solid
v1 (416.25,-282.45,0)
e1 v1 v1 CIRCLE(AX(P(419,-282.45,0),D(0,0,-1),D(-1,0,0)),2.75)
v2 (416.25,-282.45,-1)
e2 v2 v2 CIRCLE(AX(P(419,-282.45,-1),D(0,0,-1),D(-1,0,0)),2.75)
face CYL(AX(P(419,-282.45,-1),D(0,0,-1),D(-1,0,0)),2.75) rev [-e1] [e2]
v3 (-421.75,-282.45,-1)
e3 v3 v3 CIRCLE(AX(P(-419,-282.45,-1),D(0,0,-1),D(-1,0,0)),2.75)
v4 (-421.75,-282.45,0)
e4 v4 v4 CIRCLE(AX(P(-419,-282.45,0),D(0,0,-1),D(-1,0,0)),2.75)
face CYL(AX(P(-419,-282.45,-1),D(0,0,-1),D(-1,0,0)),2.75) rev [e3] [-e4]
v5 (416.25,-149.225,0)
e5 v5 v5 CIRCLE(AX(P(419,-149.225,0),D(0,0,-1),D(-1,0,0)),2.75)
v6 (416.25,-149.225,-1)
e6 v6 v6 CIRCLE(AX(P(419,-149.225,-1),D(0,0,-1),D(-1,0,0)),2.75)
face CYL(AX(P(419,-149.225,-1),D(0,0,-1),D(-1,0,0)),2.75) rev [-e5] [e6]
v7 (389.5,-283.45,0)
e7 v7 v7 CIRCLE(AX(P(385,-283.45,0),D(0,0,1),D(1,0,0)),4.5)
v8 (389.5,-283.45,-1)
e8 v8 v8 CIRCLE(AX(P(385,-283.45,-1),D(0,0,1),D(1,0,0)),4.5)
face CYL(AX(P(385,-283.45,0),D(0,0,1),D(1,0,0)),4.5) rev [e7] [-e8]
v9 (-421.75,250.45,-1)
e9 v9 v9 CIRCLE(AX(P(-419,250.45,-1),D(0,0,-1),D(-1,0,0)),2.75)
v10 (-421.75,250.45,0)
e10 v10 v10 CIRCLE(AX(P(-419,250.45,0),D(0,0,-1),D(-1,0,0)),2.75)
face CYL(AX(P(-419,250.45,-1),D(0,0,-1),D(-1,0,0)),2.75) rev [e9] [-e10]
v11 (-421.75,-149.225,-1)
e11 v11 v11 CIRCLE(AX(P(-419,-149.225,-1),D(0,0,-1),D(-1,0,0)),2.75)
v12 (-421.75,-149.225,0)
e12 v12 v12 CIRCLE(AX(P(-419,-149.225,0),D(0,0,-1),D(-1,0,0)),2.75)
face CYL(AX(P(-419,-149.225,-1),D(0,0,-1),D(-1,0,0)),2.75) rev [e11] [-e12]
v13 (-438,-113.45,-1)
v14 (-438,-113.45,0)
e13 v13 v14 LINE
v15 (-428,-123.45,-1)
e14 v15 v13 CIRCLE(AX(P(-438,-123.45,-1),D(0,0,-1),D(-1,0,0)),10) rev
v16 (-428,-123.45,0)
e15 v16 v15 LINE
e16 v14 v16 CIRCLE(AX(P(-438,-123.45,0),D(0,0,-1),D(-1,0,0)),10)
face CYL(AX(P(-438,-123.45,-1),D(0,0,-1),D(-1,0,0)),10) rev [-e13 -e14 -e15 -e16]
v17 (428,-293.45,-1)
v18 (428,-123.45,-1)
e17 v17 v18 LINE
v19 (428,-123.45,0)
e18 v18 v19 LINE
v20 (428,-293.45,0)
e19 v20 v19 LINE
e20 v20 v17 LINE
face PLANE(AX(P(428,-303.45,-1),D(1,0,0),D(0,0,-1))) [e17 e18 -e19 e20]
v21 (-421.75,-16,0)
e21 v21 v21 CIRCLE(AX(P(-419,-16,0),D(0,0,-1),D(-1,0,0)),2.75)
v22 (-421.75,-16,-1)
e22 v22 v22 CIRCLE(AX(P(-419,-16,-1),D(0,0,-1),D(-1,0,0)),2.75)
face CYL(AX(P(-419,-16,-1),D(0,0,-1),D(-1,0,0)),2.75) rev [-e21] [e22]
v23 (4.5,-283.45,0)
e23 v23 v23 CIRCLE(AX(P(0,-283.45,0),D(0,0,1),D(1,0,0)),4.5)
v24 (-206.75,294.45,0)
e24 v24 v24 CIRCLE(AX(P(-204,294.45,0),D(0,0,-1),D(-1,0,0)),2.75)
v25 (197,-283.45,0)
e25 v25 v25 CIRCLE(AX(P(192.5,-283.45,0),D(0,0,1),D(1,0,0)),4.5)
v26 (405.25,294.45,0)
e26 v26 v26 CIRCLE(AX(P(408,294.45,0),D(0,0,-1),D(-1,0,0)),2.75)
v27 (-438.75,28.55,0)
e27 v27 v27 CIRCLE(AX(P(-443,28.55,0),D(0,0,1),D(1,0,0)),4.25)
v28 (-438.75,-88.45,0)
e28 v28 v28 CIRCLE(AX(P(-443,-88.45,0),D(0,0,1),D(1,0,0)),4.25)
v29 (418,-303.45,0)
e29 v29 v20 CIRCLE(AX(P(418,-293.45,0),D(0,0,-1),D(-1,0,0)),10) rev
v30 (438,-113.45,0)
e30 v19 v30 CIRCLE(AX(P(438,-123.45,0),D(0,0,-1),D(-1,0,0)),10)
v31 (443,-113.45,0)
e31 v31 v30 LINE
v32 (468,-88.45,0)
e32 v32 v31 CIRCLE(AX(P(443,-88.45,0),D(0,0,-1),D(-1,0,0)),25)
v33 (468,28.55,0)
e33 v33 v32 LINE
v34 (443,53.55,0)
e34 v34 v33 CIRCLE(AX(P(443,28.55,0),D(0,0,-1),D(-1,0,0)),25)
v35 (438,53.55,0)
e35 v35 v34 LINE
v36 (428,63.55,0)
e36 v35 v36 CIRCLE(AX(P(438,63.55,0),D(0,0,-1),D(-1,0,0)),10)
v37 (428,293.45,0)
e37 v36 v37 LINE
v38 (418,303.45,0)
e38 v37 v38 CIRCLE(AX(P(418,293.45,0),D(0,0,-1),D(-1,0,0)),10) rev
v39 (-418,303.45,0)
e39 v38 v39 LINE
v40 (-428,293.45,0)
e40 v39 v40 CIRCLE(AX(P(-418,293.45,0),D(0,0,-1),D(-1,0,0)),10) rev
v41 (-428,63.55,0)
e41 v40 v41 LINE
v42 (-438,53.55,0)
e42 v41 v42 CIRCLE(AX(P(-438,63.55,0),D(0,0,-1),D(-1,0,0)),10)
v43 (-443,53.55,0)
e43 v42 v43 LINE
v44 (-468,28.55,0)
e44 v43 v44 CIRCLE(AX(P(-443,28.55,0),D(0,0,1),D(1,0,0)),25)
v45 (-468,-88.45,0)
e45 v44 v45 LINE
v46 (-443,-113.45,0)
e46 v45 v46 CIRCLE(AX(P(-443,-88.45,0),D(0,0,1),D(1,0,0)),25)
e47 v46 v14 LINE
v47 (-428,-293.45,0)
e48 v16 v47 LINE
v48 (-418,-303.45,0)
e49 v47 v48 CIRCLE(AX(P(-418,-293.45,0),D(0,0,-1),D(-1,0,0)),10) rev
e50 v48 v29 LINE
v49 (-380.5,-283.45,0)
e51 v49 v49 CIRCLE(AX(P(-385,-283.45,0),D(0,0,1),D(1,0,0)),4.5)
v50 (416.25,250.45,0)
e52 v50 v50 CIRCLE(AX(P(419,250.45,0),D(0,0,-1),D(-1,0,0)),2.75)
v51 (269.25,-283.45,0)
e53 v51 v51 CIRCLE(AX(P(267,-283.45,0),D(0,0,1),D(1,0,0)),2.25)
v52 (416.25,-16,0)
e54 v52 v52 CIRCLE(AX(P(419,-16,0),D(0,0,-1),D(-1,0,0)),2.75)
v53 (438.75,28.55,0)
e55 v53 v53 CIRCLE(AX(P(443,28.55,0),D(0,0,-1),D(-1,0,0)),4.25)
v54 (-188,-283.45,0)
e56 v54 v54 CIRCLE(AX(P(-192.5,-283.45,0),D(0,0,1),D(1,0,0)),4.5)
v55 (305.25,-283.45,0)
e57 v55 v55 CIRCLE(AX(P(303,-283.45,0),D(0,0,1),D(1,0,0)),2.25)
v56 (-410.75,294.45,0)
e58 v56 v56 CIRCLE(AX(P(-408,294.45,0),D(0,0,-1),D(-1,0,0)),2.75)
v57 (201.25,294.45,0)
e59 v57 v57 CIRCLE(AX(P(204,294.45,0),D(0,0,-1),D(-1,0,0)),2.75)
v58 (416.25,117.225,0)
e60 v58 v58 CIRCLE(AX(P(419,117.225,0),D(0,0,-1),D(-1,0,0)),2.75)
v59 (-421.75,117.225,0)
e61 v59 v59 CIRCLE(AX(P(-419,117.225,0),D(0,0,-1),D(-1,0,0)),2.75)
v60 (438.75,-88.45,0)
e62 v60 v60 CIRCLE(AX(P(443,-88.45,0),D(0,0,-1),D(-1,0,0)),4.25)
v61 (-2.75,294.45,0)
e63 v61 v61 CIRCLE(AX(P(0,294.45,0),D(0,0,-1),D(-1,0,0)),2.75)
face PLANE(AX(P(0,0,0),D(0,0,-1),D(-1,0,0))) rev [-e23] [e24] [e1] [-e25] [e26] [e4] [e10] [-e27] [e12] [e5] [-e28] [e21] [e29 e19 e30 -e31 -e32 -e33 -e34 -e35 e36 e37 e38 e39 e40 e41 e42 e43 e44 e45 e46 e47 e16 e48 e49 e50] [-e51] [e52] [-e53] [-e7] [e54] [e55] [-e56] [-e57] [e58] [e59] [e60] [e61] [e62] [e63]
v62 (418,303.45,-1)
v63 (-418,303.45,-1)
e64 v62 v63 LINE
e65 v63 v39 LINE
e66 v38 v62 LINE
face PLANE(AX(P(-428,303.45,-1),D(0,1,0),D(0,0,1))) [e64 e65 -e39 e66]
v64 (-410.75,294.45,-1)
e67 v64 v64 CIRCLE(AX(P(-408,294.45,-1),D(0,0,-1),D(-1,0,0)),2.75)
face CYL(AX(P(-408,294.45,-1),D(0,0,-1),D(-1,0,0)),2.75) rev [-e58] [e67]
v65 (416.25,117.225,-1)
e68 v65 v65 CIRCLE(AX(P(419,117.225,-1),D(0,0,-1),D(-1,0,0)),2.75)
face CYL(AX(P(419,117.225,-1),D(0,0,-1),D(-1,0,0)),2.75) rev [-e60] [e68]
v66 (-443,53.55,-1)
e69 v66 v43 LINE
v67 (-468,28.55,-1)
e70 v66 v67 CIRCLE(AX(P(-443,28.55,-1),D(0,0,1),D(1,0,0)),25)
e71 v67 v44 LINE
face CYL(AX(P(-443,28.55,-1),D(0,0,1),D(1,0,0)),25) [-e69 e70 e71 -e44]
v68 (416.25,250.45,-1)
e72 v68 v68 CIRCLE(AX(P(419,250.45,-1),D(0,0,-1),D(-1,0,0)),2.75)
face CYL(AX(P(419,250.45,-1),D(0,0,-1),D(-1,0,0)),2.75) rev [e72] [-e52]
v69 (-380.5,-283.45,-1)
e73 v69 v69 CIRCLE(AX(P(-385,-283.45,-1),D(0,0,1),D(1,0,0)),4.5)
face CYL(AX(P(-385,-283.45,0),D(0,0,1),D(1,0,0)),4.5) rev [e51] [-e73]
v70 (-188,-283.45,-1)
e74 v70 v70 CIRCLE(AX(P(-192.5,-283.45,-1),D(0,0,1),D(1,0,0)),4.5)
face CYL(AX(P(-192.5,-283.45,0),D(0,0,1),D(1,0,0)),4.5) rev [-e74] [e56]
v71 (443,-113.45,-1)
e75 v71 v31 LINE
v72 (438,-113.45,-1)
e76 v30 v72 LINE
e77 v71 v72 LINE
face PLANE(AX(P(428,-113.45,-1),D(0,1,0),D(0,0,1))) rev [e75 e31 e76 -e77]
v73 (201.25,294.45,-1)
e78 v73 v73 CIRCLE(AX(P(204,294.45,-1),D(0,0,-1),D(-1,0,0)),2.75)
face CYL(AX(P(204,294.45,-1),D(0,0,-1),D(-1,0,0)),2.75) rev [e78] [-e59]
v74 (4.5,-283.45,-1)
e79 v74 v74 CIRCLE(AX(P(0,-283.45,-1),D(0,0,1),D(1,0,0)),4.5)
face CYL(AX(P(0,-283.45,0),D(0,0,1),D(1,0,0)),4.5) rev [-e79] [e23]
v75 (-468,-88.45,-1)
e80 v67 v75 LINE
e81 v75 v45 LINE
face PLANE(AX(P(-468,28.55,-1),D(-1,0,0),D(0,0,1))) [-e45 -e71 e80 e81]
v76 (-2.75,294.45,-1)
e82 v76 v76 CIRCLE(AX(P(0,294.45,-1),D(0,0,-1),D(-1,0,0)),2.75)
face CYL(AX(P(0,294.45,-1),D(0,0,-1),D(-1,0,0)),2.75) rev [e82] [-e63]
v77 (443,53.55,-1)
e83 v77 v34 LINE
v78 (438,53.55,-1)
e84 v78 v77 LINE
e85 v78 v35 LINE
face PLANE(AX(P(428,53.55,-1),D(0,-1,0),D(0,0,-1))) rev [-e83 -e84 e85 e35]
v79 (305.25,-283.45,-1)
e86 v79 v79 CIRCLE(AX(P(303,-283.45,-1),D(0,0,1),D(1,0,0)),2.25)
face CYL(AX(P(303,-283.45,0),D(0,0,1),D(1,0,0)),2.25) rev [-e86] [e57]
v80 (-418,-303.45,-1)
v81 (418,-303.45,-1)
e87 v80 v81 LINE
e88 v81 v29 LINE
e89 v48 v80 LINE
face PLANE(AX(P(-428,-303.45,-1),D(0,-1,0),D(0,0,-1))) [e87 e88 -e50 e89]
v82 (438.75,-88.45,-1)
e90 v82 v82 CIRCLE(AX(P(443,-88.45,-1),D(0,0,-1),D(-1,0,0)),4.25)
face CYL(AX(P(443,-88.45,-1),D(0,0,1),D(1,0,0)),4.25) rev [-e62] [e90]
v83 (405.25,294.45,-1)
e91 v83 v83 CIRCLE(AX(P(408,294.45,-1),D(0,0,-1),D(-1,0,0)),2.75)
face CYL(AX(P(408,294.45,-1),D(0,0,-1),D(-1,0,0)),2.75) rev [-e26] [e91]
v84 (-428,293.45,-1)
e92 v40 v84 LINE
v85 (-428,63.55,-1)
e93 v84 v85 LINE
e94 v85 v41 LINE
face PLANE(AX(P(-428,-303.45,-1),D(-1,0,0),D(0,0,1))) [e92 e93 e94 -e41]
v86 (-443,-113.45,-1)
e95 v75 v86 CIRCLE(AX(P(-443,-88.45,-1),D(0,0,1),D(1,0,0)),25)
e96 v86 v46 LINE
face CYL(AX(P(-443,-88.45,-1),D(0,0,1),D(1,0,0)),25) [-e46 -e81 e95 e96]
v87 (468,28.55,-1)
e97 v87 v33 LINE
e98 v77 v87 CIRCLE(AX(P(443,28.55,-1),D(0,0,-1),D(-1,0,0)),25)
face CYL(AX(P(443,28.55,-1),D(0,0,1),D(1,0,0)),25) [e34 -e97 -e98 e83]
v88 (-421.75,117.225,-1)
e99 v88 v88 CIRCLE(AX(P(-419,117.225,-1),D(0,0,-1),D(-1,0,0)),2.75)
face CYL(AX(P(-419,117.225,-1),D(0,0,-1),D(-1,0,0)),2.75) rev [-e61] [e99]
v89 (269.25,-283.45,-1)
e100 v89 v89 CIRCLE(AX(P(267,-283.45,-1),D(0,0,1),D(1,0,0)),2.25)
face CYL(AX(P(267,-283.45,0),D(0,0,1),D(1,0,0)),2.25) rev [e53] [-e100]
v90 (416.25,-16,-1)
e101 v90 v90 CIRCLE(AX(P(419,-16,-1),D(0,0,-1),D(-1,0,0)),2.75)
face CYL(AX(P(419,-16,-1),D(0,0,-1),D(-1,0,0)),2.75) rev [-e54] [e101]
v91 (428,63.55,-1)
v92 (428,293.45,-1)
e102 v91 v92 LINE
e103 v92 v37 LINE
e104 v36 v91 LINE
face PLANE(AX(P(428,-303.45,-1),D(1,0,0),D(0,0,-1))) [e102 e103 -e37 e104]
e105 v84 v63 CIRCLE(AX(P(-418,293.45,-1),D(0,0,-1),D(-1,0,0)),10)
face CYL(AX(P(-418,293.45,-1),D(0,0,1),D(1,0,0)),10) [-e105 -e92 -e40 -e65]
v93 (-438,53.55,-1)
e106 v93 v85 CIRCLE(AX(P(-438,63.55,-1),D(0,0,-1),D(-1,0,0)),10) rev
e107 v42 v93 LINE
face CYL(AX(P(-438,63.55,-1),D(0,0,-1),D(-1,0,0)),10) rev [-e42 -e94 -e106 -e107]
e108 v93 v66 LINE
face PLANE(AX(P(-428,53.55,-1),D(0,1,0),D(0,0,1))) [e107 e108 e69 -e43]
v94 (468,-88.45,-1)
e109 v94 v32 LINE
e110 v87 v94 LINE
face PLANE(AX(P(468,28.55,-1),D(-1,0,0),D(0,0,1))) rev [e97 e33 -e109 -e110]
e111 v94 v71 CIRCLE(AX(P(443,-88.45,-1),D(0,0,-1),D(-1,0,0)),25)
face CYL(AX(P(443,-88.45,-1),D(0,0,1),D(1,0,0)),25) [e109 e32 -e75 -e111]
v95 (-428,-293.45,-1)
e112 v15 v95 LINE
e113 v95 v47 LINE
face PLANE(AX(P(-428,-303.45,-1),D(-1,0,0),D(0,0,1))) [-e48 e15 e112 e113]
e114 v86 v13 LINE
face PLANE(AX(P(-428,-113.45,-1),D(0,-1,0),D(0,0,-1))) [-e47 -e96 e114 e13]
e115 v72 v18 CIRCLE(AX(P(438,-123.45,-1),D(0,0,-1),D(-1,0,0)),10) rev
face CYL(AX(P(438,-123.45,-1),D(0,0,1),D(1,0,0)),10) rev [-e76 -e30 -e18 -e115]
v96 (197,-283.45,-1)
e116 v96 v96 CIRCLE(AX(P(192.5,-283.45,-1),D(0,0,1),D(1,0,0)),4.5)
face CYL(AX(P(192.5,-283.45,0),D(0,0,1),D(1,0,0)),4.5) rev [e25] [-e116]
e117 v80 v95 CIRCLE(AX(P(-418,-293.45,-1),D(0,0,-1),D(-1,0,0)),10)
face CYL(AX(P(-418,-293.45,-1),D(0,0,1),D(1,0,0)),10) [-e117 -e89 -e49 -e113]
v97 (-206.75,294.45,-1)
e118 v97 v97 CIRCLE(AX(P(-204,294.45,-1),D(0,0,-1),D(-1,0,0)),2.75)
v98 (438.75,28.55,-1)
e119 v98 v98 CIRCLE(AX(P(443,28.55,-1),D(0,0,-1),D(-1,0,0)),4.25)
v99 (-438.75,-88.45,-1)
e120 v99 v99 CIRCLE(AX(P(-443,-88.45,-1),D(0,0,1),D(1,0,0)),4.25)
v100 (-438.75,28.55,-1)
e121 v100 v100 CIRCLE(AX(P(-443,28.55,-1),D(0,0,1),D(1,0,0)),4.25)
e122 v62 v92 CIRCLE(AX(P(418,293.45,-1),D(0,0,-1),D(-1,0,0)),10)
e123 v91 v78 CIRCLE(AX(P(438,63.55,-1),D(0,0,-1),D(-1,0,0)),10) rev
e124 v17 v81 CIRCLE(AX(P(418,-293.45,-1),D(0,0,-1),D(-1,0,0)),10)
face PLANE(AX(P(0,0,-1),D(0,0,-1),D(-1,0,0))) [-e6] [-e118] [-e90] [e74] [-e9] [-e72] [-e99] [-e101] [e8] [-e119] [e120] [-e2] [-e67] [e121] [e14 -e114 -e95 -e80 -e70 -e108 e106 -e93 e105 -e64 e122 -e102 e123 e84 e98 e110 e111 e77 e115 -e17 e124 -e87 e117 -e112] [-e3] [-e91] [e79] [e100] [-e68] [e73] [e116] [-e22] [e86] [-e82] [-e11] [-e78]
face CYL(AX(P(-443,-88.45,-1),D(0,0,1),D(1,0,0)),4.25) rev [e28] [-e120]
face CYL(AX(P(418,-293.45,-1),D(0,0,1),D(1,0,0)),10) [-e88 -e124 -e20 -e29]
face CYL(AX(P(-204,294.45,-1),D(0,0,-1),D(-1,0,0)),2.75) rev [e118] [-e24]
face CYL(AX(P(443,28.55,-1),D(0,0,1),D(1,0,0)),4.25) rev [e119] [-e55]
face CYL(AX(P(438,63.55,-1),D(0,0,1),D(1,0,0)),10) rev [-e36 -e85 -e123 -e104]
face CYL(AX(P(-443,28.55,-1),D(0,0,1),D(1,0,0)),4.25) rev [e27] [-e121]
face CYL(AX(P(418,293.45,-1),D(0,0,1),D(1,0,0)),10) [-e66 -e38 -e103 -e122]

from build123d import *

# Parameters (mm, degrees)
SKETCH1_W            = 856
SKETCH1_H            = 606.9
BASE_FLANGE1_DEPTH   = 1
M5_CLEARANCE_HOLE1_D = 5.5
M8_CLEARANCE_HOLE1_D = 9
LPATTERN1_COUNT      = 5
LPATTERN1_PITCH      = 192.5
FILLET1_R            = 10
M4_CLEARANCE_HOLE1_D = 4.5
SKETCH8_R            = 4.25
BOSS_EXTRUDE1_DEPTH  = 1
FILLET2_R            = 10


# Sheet-metal steps are written as plain solids
with BuildPart() as part:
    # Sketch1 → Base-Flange1 (new body)
    with BuildSketch(Plane.XY):
        Rectangle(SKETCH1_W, SKETCH1_H)
    extrude(amount=-BASE_FLANGE1_DEPTH)

    # M5 Clearance Hole1 (through all)
    with Locations(Plane(origin=(0, 0, -1), x_dir=(-1, 0, 0), z_dir=(0, 0, -1))):
        with Locations((-419, -282.45), (-419, -149.225), (-419, -16), (-419, 117.225), (-419, 250.45), (-408, 294.45), (-204, 294.45), (0, 294.45), (204, 294.45), (408, 294.45), (419, 250.45), (419, 117.225), (419, -16), (419, -149.225), (419, -282.45)):
            Hole(M5_CLEARANCE_HOLE1_D / 2)

    # M8 Clearance Hole1 (through all)
    with Locations(Plane.XY):
        with Locations((-385, -283.45)):
            m8_clearance_hole1 = Hole(M8_CLEARANCE_HOLE1_D / 2)

    # LPattern1: M8 Clearance Hole1 ×5
    with Locations(*[(i * LPATTERN1_PITCH, 0, 0) for i in range(1, LPATTERN1_COUNT)]):
        add(m8_clearance_hole1, mode=Mode.SUBTRACT)

    # Fillet1
    fillet1_edges = [part.edges().sort_by_distance(p)[0] for p in [
        (428, -303.45, -0.5),
        (-428, -303.45, -0.5),
        (-428, 303.45, -0.5),
        (428, 303.45, -0.5),
    ]]
    fillet(fillet1_edges, radius=FILLET1_R)

    # M4 Clearance Hole1 (through all)
    with Locations(Plane.XY):
        with Locations((267, -283.45), (303, -283.45)):
            Hole(M4_CLEARANCE_HOLE1_D / 2)

    # Sketch8 → Boss-Extrude1 (add)
    with BuildSketch(Plane.XY):
        with BuildLine():
            Line((-428, 53.55), (-443, 53.55))
            ThreePointArc((-443, 53.55), (-460.67766953, 46.22766953), (-468, 28.55))
            Line((-468, 28.55), (-468, -88.45))
            ThreePointArc((-468, -88.45), (-460.67766953, -106.12766953), (-443, -113.45))
            Line((-443, -113.45), (-428, -113.45))
            Line((-428, -113.45), (-428, 53.55))
        make_face()
        with Locations((-443, 28.55)):
            Circle(SKETCH8_R, mode=Mode.SUBTRACT)
        with Locations((-443, -88.45)):
            Circle(SKETCH8_R, mode=Mode.SUBTRACT)
    boss_extrude1 = extrude(amount=-BOSS_EXTRUDE1_DEPTH)

    # Mirror3: Boss-Extrude1 across plane
    add(boss_extrude1.mirror(Plane(origin=(0, 0, 0), x_dir=(0, 0, 1), z_dir=(1, 0, 0))))

    # Fillet2
    fillet2_edges = [part.edges().sort_by_distance(p)[0] for p in [
        (-428, 53.55, -0.5),
        (-428, -113.45, -0.5),
        (428, -113.45, -0.5),
        (428, 53.55, -0.5),
    ]]
    fillet(fillet2_edges, radius=FILLET2_R)


solid = part.part
